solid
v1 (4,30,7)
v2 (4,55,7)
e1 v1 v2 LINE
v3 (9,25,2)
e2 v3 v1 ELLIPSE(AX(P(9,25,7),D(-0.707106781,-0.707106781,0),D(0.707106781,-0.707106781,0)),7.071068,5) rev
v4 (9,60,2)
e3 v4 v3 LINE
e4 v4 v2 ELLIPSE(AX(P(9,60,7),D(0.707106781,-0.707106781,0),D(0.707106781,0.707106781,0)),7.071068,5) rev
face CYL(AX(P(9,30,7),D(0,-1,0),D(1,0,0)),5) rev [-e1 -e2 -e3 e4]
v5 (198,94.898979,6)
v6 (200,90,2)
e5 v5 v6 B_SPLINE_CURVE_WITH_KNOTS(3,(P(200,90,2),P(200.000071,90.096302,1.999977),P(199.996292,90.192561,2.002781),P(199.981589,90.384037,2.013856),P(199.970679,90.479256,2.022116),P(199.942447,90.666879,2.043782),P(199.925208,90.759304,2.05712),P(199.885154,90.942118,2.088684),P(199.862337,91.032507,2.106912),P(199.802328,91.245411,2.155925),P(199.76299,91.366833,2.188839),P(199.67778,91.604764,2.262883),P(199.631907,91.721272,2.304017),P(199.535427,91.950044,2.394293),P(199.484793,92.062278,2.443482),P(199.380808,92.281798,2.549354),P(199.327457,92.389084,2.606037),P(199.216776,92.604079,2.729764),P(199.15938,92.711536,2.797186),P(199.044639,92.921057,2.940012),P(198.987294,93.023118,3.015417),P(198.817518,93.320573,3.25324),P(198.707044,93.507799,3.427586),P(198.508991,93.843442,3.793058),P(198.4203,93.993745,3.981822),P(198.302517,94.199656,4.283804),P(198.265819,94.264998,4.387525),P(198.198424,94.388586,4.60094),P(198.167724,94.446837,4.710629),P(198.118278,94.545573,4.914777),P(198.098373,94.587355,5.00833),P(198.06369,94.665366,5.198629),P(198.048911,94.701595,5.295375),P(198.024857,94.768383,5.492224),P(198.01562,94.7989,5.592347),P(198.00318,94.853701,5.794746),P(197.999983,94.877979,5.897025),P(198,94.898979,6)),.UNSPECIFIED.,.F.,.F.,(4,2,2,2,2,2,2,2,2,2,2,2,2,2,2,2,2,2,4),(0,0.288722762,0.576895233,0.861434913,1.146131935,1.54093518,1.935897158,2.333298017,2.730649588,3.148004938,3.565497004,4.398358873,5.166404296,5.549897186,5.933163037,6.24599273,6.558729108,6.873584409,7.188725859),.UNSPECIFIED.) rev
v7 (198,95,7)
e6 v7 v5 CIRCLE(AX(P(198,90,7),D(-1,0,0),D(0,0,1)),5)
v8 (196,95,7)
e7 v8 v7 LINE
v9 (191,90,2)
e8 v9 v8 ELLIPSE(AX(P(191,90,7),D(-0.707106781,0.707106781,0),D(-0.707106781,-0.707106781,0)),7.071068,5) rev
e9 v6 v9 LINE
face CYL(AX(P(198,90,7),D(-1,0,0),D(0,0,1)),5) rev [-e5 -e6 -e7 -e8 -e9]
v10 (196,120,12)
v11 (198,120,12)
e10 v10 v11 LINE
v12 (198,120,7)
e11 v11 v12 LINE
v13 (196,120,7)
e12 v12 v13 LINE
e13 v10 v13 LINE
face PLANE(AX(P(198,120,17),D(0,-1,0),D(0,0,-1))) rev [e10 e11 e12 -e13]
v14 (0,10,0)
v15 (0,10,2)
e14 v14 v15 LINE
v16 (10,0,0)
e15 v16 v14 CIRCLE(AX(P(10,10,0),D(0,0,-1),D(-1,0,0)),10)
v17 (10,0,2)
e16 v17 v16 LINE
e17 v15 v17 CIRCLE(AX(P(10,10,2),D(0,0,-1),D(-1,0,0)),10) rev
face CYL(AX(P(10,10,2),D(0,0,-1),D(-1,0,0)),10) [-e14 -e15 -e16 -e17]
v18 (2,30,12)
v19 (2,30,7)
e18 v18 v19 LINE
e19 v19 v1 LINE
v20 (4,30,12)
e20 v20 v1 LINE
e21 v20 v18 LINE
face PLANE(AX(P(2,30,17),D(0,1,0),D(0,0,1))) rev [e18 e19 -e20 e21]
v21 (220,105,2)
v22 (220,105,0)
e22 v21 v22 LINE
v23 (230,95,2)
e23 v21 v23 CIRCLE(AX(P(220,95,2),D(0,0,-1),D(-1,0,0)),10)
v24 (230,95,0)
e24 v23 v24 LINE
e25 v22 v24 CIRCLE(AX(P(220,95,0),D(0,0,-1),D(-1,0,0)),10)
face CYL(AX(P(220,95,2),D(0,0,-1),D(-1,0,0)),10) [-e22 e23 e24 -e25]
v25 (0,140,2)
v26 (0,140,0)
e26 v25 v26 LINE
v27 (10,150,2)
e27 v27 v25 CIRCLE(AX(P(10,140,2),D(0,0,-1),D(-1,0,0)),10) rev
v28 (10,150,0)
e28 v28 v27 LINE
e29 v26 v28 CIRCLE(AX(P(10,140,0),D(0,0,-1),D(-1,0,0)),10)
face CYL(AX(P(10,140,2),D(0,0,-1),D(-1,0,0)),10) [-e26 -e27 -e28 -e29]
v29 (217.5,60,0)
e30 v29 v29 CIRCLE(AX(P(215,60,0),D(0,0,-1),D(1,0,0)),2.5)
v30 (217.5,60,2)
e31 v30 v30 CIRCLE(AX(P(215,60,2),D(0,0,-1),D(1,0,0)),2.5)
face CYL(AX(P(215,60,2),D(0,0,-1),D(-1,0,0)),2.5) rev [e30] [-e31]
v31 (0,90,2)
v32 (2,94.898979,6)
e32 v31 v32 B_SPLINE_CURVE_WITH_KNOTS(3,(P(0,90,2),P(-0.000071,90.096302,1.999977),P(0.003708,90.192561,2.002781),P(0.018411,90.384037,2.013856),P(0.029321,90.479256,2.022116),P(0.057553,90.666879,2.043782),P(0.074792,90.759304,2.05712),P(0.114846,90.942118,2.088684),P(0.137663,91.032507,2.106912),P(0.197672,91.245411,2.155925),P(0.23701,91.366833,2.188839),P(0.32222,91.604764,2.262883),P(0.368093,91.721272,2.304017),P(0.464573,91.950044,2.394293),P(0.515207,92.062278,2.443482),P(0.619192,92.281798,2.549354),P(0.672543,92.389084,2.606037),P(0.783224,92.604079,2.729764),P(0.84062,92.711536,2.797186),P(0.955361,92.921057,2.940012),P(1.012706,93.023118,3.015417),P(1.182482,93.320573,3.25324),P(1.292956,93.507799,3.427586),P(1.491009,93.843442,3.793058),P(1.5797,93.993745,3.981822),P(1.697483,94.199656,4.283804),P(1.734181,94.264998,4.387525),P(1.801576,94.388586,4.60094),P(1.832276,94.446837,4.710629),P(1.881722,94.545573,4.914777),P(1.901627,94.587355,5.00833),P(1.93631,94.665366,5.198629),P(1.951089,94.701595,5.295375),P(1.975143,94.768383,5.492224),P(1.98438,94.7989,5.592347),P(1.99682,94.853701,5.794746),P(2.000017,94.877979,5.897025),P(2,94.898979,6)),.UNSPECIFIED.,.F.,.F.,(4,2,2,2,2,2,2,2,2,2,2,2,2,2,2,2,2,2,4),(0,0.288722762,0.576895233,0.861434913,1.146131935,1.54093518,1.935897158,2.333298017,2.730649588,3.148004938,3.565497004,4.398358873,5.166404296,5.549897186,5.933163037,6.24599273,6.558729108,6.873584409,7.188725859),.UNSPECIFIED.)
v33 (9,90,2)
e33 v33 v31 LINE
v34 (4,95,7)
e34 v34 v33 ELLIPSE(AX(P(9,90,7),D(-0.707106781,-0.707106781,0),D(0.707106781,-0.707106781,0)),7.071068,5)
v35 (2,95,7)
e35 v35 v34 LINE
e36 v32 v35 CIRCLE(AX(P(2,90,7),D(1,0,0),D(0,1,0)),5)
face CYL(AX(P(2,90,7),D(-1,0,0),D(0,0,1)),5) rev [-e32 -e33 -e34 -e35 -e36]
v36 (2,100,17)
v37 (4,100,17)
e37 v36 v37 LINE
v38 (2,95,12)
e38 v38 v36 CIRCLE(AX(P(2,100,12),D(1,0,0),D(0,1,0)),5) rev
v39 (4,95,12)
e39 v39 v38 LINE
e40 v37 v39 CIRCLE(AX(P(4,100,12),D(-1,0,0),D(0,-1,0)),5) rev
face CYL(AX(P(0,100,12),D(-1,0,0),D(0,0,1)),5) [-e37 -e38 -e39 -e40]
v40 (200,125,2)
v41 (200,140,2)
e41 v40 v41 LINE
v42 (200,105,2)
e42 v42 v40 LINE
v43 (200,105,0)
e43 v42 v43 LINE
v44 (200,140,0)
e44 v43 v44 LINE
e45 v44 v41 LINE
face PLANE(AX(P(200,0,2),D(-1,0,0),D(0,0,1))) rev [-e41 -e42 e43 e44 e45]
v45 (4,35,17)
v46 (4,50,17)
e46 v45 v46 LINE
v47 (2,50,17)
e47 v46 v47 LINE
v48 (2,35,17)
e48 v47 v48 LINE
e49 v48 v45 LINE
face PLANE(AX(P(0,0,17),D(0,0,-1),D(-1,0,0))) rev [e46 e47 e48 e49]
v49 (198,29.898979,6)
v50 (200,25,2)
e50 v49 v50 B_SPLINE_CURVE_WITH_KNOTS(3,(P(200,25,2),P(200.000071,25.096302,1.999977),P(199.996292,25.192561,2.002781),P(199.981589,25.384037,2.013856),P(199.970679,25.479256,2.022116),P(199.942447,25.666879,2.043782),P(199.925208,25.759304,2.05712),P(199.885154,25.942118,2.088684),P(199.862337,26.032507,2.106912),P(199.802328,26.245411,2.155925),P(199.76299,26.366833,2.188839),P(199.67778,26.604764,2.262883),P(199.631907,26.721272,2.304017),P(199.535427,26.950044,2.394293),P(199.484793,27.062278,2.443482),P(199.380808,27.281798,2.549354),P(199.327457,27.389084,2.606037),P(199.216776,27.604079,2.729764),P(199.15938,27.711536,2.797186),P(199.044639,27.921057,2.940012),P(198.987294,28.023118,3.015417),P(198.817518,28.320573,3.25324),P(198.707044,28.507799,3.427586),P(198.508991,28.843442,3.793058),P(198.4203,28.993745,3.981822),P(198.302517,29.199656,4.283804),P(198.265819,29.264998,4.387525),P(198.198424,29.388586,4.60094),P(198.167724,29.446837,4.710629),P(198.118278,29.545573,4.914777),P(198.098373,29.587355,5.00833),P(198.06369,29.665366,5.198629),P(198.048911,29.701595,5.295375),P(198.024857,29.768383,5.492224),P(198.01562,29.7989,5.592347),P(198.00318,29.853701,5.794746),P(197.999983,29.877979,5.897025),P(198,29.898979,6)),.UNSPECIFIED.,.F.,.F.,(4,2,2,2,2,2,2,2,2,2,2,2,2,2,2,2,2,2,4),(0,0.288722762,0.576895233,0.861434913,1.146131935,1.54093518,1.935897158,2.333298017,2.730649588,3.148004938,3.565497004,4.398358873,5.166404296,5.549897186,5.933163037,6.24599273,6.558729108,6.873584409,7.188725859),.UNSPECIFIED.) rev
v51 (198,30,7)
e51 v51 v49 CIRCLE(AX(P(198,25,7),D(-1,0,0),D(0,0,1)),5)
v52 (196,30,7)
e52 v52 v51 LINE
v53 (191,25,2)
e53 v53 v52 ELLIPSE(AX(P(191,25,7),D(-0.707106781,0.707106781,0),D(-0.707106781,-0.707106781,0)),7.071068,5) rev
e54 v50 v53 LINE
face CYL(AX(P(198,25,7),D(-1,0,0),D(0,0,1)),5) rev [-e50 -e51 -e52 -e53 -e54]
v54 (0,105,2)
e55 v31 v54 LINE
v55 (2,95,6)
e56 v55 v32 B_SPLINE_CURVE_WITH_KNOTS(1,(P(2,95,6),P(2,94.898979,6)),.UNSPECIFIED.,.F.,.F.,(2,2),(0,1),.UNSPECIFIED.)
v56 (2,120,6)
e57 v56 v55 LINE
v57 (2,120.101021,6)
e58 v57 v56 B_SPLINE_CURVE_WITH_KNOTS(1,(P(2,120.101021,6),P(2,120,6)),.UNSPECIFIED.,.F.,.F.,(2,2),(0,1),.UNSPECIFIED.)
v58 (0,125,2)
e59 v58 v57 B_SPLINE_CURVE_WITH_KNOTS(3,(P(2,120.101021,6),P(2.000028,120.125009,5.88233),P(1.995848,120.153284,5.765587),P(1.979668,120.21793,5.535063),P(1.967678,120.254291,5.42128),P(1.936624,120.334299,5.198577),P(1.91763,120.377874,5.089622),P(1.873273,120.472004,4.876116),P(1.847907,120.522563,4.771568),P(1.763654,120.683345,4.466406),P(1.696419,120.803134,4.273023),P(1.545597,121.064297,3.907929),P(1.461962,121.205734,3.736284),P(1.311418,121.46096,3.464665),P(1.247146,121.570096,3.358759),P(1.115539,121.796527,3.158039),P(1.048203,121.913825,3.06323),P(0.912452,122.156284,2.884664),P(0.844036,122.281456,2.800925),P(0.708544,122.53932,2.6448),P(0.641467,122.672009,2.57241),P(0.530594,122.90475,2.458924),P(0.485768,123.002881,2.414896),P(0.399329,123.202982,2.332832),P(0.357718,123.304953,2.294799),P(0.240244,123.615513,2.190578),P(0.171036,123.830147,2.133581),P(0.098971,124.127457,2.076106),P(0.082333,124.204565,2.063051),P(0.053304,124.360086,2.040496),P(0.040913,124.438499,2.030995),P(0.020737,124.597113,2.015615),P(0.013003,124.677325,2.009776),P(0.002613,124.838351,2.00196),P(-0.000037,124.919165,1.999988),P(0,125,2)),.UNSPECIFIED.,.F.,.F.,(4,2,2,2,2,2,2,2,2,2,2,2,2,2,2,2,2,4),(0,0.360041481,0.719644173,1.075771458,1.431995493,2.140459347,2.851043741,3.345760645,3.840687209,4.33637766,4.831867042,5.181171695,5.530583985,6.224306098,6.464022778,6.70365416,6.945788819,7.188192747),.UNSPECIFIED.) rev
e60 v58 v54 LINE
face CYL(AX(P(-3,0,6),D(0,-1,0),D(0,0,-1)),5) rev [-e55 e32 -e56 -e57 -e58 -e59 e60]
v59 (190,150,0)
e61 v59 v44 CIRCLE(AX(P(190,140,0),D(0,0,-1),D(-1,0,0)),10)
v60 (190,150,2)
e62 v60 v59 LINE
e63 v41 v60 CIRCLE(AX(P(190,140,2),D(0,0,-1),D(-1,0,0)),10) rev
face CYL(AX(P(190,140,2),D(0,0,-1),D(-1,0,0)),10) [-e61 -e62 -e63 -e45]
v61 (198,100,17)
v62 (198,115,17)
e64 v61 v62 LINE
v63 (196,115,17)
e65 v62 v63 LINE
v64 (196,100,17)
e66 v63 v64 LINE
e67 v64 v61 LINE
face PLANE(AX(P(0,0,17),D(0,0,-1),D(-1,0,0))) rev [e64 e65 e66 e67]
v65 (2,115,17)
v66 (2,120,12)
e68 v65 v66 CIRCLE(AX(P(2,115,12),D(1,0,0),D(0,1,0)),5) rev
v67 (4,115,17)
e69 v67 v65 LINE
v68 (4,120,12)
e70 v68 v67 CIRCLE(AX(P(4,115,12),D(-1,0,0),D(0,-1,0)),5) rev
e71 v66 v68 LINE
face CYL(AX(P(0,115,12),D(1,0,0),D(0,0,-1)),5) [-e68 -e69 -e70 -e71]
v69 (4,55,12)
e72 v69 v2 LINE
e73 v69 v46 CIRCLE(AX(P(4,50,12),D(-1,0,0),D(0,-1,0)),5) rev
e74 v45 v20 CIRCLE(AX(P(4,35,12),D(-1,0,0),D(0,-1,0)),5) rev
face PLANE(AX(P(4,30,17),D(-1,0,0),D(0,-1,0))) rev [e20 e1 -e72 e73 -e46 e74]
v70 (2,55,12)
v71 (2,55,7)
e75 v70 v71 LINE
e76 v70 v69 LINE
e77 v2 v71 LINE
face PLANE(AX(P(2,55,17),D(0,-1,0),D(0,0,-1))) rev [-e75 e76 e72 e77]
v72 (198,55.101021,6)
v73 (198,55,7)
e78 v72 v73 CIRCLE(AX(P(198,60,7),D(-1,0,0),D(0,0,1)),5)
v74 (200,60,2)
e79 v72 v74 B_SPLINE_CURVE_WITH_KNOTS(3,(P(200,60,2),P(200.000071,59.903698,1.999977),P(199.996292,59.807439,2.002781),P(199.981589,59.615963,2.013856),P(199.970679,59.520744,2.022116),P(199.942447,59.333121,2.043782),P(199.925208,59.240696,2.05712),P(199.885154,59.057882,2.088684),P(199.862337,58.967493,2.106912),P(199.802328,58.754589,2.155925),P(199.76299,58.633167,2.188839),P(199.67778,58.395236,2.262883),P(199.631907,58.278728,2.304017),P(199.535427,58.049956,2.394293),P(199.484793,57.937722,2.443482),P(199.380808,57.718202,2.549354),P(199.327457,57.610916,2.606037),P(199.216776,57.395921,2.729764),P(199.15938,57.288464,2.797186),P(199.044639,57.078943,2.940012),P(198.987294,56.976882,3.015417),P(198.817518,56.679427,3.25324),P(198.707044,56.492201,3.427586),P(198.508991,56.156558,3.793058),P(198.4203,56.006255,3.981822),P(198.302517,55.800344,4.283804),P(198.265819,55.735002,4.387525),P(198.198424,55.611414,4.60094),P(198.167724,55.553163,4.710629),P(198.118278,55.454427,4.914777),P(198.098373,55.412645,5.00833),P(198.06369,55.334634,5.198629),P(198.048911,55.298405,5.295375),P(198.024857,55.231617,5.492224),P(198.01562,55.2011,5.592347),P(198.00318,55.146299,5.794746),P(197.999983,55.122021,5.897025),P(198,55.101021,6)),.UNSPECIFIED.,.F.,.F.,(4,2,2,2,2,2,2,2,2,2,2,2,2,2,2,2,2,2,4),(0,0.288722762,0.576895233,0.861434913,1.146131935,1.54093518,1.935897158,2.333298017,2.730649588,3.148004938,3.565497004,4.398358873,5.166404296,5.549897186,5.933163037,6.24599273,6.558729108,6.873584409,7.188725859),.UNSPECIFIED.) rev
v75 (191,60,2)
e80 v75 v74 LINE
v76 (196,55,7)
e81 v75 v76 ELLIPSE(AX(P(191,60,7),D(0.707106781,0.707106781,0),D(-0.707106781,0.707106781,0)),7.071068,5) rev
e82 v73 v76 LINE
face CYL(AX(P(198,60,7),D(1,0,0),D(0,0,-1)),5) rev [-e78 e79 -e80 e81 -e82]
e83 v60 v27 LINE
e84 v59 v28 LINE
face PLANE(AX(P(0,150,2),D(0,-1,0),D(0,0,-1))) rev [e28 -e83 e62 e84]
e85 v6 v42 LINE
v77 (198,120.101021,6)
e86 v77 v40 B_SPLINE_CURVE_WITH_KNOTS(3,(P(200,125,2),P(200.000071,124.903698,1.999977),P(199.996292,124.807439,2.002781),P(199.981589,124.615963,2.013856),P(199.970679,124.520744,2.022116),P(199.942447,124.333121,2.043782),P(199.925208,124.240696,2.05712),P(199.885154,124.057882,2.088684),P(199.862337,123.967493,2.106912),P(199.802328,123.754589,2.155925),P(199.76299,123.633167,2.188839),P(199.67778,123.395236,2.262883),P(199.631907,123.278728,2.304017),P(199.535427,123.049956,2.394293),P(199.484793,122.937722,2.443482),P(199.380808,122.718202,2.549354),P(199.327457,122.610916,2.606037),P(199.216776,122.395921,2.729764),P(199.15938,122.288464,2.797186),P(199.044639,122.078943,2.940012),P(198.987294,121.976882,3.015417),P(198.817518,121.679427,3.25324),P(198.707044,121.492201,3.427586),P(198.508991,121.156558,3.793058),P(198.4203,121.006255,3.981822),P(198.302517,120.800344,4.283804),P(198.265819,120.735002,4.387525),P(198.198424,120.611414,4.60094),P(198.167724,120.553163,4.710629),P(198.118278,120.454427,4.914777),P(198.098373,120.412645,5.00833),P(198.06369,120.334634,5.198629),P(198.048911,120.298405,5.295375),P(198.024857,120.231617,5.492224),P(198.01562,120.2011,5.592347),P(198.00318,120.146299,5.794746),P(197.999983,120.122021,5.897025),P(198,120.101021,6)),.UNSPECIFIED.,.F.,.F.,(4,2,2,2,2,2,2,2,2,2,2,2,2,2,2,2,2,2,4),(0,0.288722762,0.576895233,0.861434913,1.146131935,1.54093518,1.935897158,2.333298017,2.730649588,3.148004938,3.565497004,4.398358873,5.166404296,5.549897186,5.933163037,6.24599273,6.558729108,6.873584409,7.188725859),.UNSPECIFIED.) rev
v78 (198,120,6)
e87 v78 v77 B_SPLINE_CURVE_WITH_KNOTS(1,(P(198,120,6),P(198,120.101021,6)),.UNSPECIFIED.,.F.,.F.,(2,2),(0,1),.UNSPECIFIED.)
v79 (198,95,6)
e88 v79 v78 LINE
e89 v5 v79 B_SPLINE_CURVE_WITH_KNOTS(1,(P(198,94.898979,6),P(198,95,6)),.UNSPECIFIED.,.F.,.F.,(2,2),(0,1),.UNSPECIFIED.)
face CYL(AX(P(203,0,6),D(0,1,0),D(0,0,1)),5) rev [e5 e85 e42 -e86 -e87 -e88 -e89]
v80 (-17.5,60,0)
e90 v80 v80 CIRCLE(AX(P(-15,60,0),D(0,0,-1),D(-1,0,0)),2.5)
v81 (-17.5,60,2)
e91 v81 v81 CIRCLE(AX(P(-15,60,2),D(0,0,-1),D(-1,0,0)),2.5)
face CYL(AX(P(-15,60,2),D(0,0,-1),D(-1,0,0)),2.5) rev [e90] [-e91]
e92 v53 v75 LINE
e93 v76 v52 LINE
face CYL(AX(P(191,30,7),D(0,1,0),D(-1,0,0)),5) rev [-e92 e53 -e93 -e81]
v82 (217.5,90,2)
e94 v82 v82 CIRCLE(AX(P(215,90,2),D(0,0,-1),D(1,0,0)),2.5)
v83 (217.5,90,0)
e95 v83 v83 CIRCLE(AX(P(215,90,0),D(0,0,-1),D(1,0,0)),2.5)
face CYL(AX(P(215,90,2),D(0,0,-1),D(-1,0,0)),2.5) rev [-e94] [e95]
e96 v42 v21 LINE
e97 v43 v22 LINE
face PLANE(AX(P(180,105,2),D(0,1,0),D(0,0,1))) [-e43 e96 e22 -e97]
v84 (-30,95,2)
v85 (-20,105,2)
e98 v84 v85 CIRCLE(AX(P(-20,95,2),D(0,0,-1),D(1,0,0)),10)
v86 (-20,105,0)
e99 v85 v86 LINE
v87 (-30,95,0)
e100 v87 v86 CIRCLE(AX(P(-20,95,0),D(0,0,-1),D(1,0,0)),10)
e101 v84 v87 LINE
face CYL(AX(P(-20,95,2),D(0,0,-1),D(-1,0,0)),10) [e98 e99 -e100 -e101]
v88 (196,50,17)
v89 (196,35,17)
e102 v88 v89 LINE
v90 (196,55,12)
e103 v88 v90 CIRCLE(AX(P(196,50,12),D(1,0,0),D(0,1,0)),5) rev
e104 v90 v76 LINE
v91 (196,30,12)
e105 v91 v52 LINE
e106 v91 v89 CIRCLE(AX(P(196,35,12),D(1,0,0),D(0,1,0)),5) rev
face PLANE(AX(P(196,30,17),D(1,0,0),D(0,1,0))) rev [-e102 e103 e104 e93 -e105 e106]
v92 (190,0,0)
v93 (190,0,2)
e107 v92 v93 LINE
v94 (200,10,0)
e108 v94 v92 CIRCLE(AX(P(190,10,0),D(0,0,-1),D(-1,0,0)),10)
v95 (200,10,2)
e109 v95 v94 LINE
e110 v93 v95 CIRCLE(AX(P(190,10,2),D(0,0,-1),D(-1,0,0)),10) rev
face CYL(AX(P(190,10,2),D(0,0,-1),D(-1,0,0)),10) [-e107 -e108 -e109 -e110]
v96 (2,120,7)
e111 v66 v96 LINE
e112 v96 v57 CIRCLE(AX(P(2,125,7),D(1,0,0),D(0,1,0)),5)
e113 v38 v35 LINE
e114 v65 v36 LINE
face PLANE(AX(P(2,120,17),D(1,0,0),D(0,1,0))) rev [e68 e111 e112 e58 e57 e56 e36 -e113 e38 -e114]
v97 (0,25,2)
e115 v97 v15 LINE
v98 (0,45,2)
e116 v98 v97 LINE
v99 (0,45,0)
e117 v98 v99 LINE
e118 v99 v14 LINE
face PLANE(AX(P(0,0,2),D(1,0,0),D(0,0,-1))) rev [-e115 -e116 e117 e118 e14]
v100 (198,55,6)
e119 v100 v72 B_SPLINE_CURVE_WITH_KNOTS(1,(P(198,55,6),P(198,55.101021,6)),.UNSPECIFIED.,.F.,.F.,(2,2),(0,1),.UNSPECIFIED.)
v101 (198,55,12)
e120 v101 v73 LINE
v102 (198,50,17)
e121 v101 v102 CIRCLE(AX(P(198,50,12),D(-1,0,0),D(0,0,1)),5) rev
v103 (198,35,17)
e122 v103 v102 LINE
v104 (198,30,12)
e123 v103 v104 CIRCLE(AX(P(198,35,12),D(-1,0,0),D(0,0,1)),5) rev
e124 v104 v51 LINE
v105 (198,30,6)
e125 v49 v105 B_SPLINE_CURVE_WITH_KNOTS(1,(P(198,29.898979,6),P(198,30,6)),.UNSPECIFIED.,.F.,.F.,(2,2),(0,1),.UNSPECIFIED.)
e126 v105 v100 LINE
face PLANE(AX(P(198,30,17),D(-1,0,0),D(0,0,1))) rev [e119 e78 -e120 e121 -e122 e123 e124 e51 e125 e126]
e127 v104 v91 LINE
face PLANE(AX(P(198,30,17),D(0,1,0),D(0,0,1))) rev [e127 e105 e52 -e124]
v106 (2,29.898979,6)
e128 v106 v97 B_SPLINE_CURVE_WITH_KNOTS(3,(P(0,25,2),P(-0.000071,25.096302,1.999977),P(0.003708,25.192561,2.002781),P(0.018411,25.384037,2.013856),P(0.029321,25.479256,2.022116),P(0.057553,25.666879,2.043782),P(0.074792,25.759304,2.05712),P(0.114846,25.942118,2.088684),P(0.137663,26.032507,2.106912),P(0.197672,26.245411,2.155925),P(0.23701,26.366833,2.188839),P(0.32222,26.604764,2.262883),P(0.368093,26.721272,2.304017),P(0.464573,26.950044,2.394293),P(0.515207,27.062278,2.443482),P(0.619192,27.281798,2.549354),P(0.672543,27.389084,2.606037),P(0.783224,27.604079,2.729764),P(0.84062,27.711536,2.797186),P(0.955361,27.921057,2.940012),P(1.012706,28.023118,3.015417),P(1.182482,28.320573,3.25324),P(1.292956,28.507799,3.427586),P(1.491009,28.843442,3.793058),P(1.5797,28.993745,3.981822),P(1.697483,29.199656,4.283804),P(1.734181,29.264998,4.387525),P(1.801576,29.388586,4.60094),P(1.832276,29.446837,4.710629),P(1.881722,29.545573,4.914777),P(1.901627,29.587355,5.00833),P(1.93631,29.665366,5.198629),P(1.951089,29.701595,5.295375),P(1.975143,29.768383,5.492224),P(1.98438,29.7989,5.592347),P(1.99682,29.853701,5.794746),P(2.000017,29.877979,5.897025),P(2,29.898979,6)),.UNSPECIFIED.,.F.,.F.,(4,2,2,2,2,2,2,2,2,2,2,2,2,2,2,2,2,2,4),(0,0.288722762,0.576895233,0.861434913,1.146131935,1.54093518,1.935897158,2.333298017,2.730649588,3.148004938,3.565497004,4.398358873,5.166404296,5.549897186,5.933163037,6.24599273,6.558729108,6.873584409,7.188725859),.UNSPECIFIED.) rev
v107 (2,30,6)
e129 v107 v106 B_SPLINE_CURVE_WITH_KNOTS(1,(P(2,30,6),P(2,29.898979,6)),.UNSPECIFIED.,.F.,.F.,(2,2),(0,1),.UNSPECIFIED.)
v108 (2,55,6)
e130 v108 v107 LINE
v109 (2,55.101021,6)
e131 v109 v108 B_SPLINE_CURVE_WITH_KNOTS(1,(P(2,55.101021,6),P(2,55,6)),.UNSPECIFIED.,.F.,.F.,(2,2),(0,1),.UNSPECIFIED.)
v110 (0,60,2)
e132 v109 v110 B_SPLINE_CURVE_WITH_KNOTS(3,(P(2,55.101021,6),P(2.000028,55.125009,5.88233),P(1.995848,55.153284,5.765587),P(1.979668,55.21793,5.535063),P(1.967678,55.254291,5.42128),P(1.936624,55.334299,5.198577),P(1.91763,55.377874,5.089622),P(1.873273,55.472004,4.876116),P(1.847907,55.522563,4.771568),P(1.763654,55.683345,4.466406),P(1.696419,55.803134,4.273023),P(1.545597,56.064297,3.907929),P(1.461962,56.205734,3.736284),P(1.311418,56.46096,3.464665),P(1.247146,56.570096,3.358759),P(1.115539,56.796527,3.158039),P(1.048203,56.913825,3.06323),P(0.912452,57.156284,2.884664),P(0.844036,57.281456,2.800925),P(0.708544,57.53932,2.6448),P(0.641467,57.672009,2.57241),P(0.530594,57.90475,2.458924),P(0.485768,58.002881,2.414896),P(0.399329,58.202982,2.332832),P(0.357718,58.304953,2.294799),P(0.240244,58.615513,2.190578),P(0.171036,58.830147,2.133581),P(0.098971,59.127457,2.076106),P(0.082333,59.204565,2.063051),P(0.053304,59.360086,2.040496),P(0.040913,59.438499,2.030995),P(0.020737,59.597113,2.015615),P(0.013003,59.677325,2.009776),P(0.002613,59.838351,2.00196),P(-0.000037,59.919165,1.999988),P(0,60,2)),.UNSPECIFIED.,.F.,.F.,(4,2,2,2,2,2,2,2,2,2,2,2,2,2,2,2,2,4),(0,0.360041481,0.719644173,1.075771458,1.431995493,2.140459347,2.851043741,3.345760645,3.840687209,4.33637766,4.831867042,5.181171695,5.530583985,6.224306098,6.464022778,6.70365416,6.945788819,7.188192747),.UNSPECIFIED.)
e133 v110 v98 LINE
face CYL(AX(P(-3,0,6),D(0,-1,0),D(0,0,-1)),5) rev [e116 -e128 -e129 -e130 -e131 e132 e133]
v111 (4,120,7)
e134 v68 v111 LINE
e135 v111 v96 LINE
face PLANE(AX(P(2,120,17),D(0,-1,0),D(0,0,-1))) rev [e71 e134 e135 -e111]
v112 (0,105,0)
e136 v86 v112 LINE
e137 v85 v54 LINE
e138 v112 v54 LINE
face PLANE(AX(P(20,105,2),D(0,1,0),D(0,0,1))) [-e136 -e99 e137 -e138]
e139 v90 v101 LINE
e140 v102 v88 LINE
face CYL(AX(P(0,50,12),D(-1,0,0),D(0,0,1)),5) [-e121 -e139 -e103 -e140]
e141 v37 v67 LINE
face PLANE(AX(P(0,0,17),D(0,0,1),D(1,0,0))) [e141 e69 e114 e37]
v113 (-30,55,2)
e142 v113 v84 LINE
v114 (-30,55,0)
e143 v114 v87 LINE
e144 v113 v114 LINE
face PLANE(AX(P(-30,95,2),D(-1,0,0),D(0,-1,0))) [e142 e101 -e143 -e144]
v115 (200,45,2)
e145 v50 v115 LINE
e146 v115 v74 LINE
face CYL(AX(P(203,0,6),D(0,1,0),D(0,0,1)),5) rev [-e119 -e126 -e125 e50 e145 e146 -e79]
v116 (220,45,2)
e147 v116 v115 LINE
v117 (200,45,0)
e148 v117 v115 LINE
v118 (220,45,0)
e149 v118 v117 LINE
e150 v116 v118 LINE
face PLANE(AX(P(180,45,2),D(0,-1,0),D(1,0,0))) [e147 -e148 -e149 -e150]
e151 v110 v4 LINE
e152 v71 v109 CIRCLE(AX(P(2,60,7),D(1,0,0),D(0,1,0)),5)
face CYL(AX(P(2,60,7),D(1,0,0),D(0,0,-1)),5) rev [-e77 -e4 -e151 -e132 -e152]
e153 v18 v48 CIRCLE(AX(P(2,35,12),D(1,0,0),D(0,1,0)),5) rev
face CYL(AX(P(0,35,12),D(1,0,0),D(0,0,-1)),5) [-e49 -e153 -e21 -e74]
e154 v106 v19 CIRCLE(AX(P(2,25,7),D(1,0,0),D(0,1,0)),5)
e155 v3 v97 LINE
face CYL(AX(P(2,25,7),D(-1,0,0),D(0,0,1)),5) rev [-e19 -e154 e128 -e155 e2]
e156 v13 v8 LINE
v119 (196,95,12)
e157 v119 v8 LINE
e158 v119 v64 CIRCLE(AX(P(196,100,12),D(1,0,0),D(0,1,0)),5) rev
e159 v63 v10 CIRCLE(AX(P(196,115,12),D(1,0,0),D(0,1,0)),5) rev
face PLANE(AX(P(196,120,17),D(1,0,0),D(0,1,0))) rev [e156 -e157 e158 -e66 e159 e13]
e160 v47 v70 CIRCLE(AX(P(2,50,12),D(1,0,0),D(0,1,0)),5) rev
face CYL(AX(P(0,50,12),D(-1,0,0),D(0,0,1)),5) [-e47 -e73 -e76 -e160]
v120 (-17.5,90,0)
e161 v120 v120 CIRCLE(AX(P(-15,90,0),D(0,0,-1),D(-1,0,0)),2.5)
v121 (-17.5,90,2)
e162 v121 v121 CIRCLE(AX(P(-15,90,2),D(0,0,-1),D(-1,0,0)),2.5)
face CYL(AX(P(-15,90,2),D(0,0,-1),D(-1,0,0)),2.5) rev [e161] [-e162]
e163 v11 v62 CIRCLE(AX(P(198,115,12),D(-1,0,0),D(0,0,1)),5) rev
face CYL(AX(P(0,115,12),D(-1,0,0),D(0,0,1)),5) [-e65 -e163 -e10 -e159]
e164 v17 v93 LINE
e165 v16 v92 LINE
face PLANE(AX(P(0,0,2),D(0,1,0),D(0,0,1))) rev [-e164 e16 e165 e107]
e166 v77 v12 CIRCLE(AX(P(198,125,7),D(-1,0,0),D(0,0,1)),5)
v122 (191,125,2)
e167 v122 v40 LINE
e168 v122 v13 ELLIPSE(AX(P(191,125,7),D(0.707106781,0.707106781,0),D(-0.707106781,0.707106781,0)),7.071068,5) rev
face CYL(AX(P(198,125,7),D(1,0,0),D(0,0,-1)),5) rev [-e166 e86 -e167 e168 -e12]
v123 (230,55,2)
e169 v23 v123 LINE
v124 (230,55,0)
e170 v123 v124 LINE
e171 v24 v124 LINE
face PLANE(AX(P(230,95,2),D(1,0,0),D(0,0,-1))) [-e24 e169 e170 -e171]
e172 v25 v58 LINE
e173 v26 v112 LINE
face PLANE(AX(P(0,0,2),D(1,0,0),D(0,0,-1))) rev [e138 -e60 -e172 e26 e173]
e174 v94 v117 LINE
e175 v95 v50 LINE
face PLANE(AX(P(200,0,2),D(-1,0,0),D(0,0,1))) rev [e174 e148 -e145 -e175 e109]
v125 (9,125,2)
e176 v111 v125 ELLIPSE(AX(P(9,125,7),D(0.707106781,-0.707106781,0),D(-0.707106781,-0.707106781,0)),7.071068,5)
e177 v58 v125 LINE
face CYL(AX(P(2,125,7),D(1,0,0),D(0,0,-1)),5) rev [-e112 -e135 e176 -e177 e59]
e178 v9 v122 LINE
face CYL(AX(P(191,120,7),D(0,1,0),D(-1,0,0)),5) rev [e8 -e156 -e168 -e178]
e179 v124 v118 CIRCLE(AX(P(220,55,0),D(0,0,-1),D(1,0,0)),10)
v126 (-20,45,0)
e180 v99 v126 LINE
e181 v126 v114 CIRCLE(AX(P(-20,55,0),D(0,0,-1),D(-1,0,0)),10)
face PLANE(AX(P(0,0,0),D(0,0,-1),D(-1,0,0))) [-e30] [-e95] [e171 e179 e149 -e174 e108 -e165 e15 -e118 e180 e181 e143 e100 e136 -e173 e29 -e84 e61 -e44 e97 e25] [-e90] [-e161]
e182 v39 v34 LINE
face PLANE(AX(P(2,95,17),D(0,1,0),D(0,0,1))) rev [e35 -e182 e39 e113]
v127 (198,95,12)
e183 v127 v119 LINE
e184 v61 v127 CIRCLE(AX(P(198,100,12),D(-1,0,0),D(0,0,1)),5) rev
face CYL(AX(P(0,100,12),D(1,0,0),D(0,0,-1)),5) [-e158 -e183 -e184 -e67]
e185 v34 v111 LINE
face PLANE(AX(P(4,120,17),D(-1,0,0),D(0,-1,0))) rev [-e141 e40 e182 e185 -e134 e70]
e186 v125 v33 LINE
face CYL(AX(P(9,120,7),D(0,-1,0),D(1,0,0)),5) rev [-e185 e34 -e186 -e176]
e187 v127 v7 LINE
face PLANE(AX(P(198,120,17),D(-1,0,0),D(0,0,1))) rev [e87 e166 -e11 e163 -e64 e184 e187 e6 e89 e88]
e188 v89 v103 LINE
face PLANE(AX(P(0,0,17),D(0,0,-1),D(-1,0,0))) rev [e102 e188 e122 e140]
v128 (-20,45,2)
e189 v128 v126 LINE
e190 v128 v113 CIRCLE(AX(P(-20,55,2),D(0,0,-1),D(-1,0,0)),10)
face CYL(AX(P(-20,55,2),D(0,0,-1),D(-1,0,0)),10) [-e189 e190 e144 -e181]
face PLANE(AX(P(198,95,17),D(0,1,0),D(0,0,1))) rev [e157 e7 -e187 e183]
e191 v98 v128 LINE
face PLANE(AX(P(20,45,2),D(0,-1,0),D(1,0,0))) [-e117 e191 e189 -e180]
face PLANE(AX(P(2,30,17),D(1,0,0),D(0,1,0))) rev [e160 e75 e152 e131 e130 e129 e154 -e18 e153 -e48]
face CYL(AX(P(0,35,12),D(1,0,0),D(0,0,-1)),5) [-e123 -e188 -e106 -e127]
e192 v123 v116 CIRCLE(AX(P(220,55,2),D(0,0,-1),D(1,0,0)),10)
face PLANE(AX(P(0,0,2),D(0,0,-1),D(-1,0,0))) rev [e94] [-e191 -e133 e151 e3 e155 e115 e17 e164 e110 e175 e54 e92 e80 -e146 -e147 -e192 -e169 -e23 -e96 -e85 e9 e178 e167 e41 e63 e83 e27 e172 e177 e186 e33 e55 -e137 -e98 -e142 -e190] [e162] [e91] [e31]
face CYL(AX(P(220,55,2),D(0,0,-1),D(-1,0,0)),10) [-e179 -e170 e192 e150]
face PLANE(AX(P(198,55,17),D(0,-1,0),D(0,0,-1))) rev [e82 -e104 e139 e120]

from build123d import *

# Parameters (mm, degrees)
ESQUISSE1_W             = 200
ESQUISSE1_H             = 150
BOSS_EXTRU_1_DEPTH      = 2
CONG_1_R                = 10
ESQUISSE2_W             = 2
ESQUISSE2_H             = 25
BOSS_EXTRU_2_DEPTH      = 15
CONG_2_R                = 5
ESQUISSE3_W             = 4.5
ESQUISSE3_H             = 30
ENL_V_MAT_EXTRU_1_DEPTH = 15
ESQUISSE4_R             = 2.5
BOSS_EXTRU_3_DEPTH      = 2


with BuildPart() as part:
    # Esquisse1 → Boss.-Extru.1 (new body)
    with BuildSketch(Plane.XY):
        with Locations((100, 75)):
            Rectangle(ESQUISSE1_W, ESQUISSE1_H)
    extrude(amount=BOSS_EXTRU_1_DEPTH)

    # Congé1
    cong_1_edges = [part.edges().sort_by_distance(p)[0] for p in [
        (0, 150, 1),
        (200, 150, 1),
        (200, 0, 1),
        (0, 0, 1),
    ]]
    fillet(cong_1_edges, radius=CONG_1_R)

    # Esquisse2 → Boss.-Extru.2 (add)
    with BuildSketch(Plane.XY.offset(2)):
        with Locations((3, 107.5)):
            Rectangle(ESQUISSE2_W, ESQUISSE2_H)
        with Locations((3, 42.5)):
            Rectangle(ESQUISSE2_W, ESQUISSE2_H)
        with Locations((197, 42.5)):
            Rectangle(ESQUISSE2_W, ESQUISSE2_H)
        with Locations((197, 107.5)):
            Rectangle(ESQUISSE2_W, ESQUISSE2_H)
    extrude(amount=BOSS_EXTRU_2_DEPTH)

    # Congé2
    # the kernel refuses this fillet: 5 mm, written as the material it adds along each edge
    with BuildSketch(Plane(origin=(2, 30, 2), x_dir=(-1, 0, 0), z_dir=(0, 1, 0)), Plane(origin=(2, 95, 2), x_dir=(-1, 0, 0), z_dir=(0, 1, 0))) as cong_2_piece_1:
        with BuildLine():
            CenterArc((5, 4), CONG_2_R, 180, 53.130102354)
            Line((0, 4), (0, 0))
            Line((0, 0), (2, 0))
        make_face()
    extrude(amount=25)
    with BuildSketch(Plane(origin=(4, 30, 2), x_dir=(0, -1, 0), z_dir=(-1, 0, 0)), Plane(origin=(2, 55, 2), x_dir=(0, 1, 0), z_dir=(1, 0, 0)), Plane(origin=(4, 95, 2), x_dir=(0, -1, 0), z_dir=(-1, 0, 0)), Plane(origin=(2, 120, 2), x_dir=(0, 1, 0), z_dir=(1, 0, 0))) as cong_2_piece_2:
        with BuildLine():
            CenterArc((CONG_2_R, CONG_2_R), CONG_2_R, 180, 90)
            Line((0, CONG_2_R), (0, 0))
            Line((0, 0), (CONG_2_R, 0))
        make_face()
    extrude(amount=2)
    with BuildSketch(Plane(origin=(4, 55, 2), x_dir=(1, 0, 0), z_dir=(0, -1, 0)), Plane(origin=(4, 120, 2), x_dir=(1, 0, 0), z_dir=(0, -1, 0))) as cong_2_piece_3:
        with BuildLine():
            CenterArc((CONG_2_R, CONG_2_R), CONG_2_R, 180, 90)
            Line((0, CONG_2_R), (0, 0))
            Line((0, 0), (CONG_2_R, 0))
        make_face()
    extrude(amount=25)
    with BuildSketch(Plane(origin=(198, 95, 2), x_dir=(1, 0, 0), z_dir=(0, 1, 0)), Plane(origin=(198, 30, 2), x_dir=(1, 0, 0), z_dir=(0, 1, 0))) as cong_2_piece_4:
        with BuildLine():
            CenterArc((5, -4), CONG_2_R, 126.869897646, 53.130102354)
            Line((0, -4), (0, 0))
            Line((0, 0), (2, 0))
        make_face()
    extrude(amount=25)
    with BuildSketch(Plane(origin=(198, 120, 2), x_dir=(0, 1, 0), z_dir=(-1, 0, 0)), Plane(origin=(196, 95, 2), x_dir=(0, -1, 0), z_dir=(1, 0, 0)), Plane(origin=(196, 30, 2), x_dir=(0, -1, 0), z_dir=(1, 0, 0)), Plane(origin=(198, 55, 2), x_dir=(0, 1, 0), z_dir=(-1, 0, 0))) as cong_2_piece_5:
        with BuildLine():
            CenterArc((CONG_2_R, -CONG_2_R), CONG_2_R, 90, 90)
            Line((0, -CONG_2_R), (0, 0))
            Line((0, 0), (CONG_2_R, 0))
        make_face()
    extrude(amount=2)
    with BuildSketch(Plane(origin=(196, 120, 2), x_dir=(-1, 0, 0), z_dir=(0, -1, 0)), Plane(origin=(196, 55, 2), x_dir=(-1, 0, 0), z_dir=(0, -1, 0))) as cong_2_piece_6:
        with BuildLine():
            CenterArc((CONG_2_R, -CONG_2_R), CONG_2_R, 90, 90)
            Line((0, -CONG_2_R), (0, 0))
            Line((0, 0), (CONG_2_R, 0))
        make_face()
    extrude(amount=25)
    with BuildSketch(Plane(origin=(2, 20, 2), x_dir=(-1, 0, 0), z_dir=(0, 1, 0))) as cong_2_piece_7a_section:
        with BuildLine():
            CenterArc((5, 4), CONG_2_R, 180, 53.130102354)
            Line((0, 4), (0, 0))
            Line((0, 0), (2, 0))
        make_face()
    cong_2_piece_7a = extrude(amount=35, mode=Mode.PRIVATE)
    cong_2_piece_7a = split(cong_2_piece_7a, bisect_by=Plane(origin=(2, 30, 2), z_dir=(0, -1, 0)), keep=Keep.TOP, mode=Mode.PRIVATE)
    with BuildSketch(Plane(origin=(4, 30, 2), x_dir=(0, -1, 0), z_dir=(-1, 0, 0))) as cong_2_piece_7b_section:
        with BuildLine():
            CenterArc((CONG_2_R, CONG_2_R), CONG_2_R, 180, 90)
            Line((0, CONG_2_R), (0, 0))
            Line((0, 0), (CONG_2_R, 0))
        make_face()
    cong_2_piece_7b = extrude(amount=14.5, mode=Mode.PRIVATE)
    cong_2_piece_7b = split(cong_2_piece_7b, bisect_by=Plane(origin=(0, 30, 2), z_dir=(1, 0, 0)), keep=Keep.TOP, mode=Mode.PRIVATE)
    cong_2_piece_7b = split(cong_2_piece_7b, bisect_by=Plane(origin=(2, 30, 2), z_dir=(-1, 0, 0)), keep=Keep.TOP, mode=Mode.PRIVATE)
    cong_2_piece_7 = cong_2_piece_7a & cong_2_piece_7b
    add(cong_2_piece_7)
    with BuildSketch(Plane(origin=(2, 30, 2), x_dir=(-1, 0, 0), z_dir=(0, 1, 0))) as cong_2_piece_8a_section:
        with BuildLine():
            CenterArc((5, 4), CONG_2_R, 180, 53.130102354)
            Line((0, 4), (0, 0))
            Line((0, 0), (2, 0))
        make_face()
    cong_2_piece_8a = extrude(amount=35, mode=Mode.PRIVATE)
    cong_2_piece_8a = split(cong_2_piece_8a, bisect_by=Plane(origin=(2, 55, 2), z_dir=(0, 1, 0)), keep=Keep.TOP, mode=Mode.PRIVATE)
    with BuildSketch(Plane(origin=(-10.5, 55, 2), x_dir=(0, 1, 0), z_dir=(1, 0, 0))) as cong_2_piece_8b_section:
        with BuildLine():
            CenterArc((CONG_2_R, CONG_2_R), CONG_2_R, 180, 90)
            Line((0, CONG_2_R), (0, 0))
            Line((0, 0), (CONG_2_R, 0))
        make_face()
    cong_2_piece_8b = extrude(amount=14.5, mode=Mode.PRIVATE)
    cong_2_piece_8b = split(cong_2_piece_8b, bisect_by=Plane(origin=(0, 55, 2), z_dir=(1, 0, 0)), keep=Keep.TOP, mode=Mode.PRIVATE)
    cong_2_piece_8b = split(cong_2_piece_8b, bisect_by=Plane(origin=(2, 55, 2), z_dir=(-1, 0, 0)), keep=Keep.TOP, mode=Mode.PRIVATE)
    cong_2_piece_8 = cong_2_piece_8a & cong_2_piece_8b
    add(cong_2_piece_8)
    with BuildSketch(Plane(origin=(16.5, 30, 2), x_dir=(0, -1, 0), z_dir=(-1, 0, 0))) as cong_2_piece_9a_section:
        with BuildLine():
            CenterArc((CONG_2_R, CONG_2_R), CONG_2_R, 180, 90)
            Line((0, CONG_2_R), (0, 0))
            Line((0, 0), (CONG_2_R, 0))
        make_face()
    cong_2_piece_9a = extrude(amount=14.5, mode=Mode.PRIVATE)
    cong_2_piece_9a = split(cong_2_piece_9a, bisect_by=Plane(origin=(4, 30, 2), z_dir=(1, 0, 0)), keep=Keep.TOP, mode=Mode.PRIVATE)
    with BuildSketch(Plane(origin=(4, 55, 2), x_dir=(1, 0, 0), z_dir=(0, -1, 0))) as cong_2_piece_9b_section:
        with BuildLine():
            CenterArc((CONG_2_R, CONG_2_R), CONG_2_R, 180, 90)
            Line((0, CONG_2_R), (0, 0))
            Line((0, 0), (CONG_2_R, 0))
        make_face()
    cong_2_piece_9b = extrude(amount=37.5, mode=Mode.PRIVATE)
    cong_2_piece_9b = split(cong_2_piece_9b, bisect_by=Plane(origin=(4, 30, 2), z_dir=(0, -1, 0)), keep=Keep.TOP, mode=Mode.PRIVATE)
    cong_2_piece_9 = cong_2_piece_9a & cong_2_piece_9b
    add(cong_2_piece_9)
    with BuildSketch(Plane(origin=(4, 67.5, 2), x_dir=(1, 0, 0), z_dir=(0, -1, 0))) as cong_2_piece_10a_section:
        with BuildLine():
            CenterArc((CONG_2_R, CONG_2_R), CONG_2_R, 180, 90)
            Line((0, CONG_2_R), (0, 0))
            Line((0, 0), (CONG_2_R, 0))
        make_face()
    cong_2_piece_10a = extrude(amount=37.5, mode=Mode.PRIVATE)
    cong_2_piece_10a = split(cong_2_piece_10a, bisect_by=Plane(origin=(4, 55, 2), z_dir=(0, 1, 0)), keep=Keep.TOP, mode=Mode.PRIVATE)
    with BuildSketch(Plane(origin=(2, 55, 2), x_dir=(0, 1, 0), z_dir=(1, 0, 0))) as cong_2_piece_10b_section:
        with BuildLine():
            CenterArc((CONG_2_R, CONG_2_R), CONG_2_R, 180, 90)
            Line((0, CONG_2_R), (0, 0))
            Line((0, 0), (CONG_2_R, 0))
        make_face()
    cong_2_piece_10b = extrude(amount=14.5, mode=Mode.PRIVATE)
    cong_2_piece_10b = split(cong_2_piece_10b, bisect_by=Plane(origin=(4, 55, 2), z_dir=(1, 0, 0)), keep=Keep.TOP, mode=Mode.PRIVATE)
    cong_2_piece_10 = cong_2_piece_10a & cong_2_piece_10b
    add(cong_2_piece_10)
    with BuildSketch(Plane(origin=(196, 95, 2), x_dir=(0, -1, 0), z_dir=(1, 0, 0))) as cong_2_piece_11a_section:
        with BuildLine():
            CenterArc((CONG_2_R, -CONG_2_R), CONG_2_R, 90, 90)
            Line((0, -CONG_2_R), (0, 0))
            Line((0, 0), (CONG_2_R, 0))
        make_face()
    cong_2_piece_11a = extrude(amount=14.5, mode=Mode.PRIVATE)
    cong_2_piece_11a = split(cong_2_piece_11a, bisect_by=Plane(origin=(200, 95, 2), z_dir=(-1, 0, 0)), keep=Keep.TOP, mode=Mode.PRIVATE)
    cong_2_piece_11a = split(cong_2_piece_11a, bisect_by=Plane(origin=(198, 95, 2), z_dir=(1, 0, 0)), keep=Keep.TOP, mode=Mode.PRIVATE)
    with BuildSketch(Plane(origin=(198, 85, 2), x_dir=(1, 0, 0), z_dir=(0, 1, 0))) as cong_2_piece_11b_section:
        with BuildLine():
            CenterArc((5, -4), CONG_2_R, 126.869897646, 53.130102354)
            Line((0, -4), (0, 0))
            Line((0, 0), (2, 0))
        make_face()
    cong_2_piece_11b = extrude(amount=35, mode=Mode.PRIVATE)
    cong_2_piece_11b = split(cong_2_piece_11b, bisect_by=Plane(origin=(198, 95, 2), z_dir=(0, -1, 0)), keep=Keep.TOP, mode=Mode.PRIVATE)
    cong_2_piece_11 = cong_2_piece_11a & cong_2_piece_11b
    add(cong_2_piece_11)
    with BuildSketch(Plane(origin=(198, 95, 2), x_dir=(1, 0, 0), z_dir=(0, 1, 0))) as cong_2_piece_12a_section:
        with BuildLine():
            CenterArc((5, -4), CONG_2_R, 126.869897646, 53.130102354)
            Line((0, -4), (0, 0))
            Line((0, 0), (2, 0))
        make_face()
    cong_2_piece_12a = extrude(amount=35, mode=Mode.PRIVATE)
    cong_2_piece_12a = split(cong_2_piece_12a, bisect_by=Plane(origin=(198, 120, 2), z_dir=(0, 1, 0)), keep=Keep.TOP, mode=Mode.PRIVATE)
    with BuildSketch(Plane(origin=(210.5, 120, 2), x_dir=(0, 1, 0), z_dir=(-1, 0, 0))) as cong_2_piece_12b_section:
        with BuildLine():
            CenterArc((CONG_2_R, -CONG_2_R), CONG_2_R, 90, 90)
            Line((0, -CONG_2_R), (0, 0))
            Line((0, 0), (CONG_2_R, 0))
        make_face()
    cong_2_piece_12b = extrude(amount=14.5, mode=Mode.PRIVATE)
    cong_2_piece_12b = split(cong_2_piece_12b, bisect_by=Plane(origin=(200, 120, 2), z_dir=(-1, 0, 0)), keep=Keep.TOP, mode=Mode.PRIVATE)
    cong_2_piece_12b = split(cong_2_piece_12b, bisect_by=Plane(origin=(198, 120, 2), z_dir=(1, 0, 0)), keep=Keep.TOP, mode=Mode.PRIVATE)
    cong_2_piece_12 = cong_2_piece_12a & cong_2_piece_12b
    add(cong_2_piece_12)
    with BuildSketch(Plane(origin=(196, 132.5, 2), x_dir=(-1, 0, 0), z_dir=(0, -1, 0))) as cong_2_piece_13a_section:
        with BuildLine():
            CenterArc((CONG_2_R, -CONG_2_R), CONG_2_R, 90, 90)
            Line((0, -CONG_2_R), (0, 0))
            Line((0, 0), (CONG_2_R, 0))
        make_face()
    cong_2_piece_13a = extrude(amount=37.5, mode=Mode.PRIVATE)
    cong_2_piece_13a = split(cong_2_piece_13a, bisect_by=Plane(origin=(196, 120, 2), z_dir=(0, 1, 0)), keep=Keep.TOP, mode=Mode.PRIVATE)
    with BuildSketch(Plane(origin=(198, 120, 2), x_dir=(0, 1, 0), z_dir=(-1, 0, 0))) as cong_2_piece_13b_section:
        with BuildLine():
            CenterArc((CONG_2_R, -CONG_2_R), CONG_2_R, 90, 90)
            Line((0, -CONG_2_R), (0, 0))
            Line((0, 0), (CONG_2_R, 0))
        make_face()
    cong_2_piece_13b = extrude(amount=14.5, mode=Mode.PRIVATE)
    cong_2_piece_13b = split(cong_2_piece_13b, bisect_by=Plane(origin=(196, 120, 2), z_dir=(-1, 0, 0)), keep=Keep.TOP, mode=Mode.PRIVATE)
    cong_2_piece_13 = cong_2_piece_13a & cong_2_piece_13b
    add(cong_2_piece_13)
    with BuildSketch(Plane(origin=(196, 120, 2), x_dir=(-1, 0, 0), z_dir=(0, -1, 0))) as cong_2_piece_14a_section:
        with BuildLine():
            CenterArc((CONG_2_R, -CONG_2_R), CONG_2_R, 90, 90)
            Line((0, -CONG_2_R), (0, 0))
            Line((0, 0), (CONG_2_R, 0))
        make_face()
    cong_2_piece_14a = extrude(amount=37.5, mode=Mode.PRIVATE)
    cong_2_piece_14a = split(cong_2_piece_14a, bisect_by=Plane(origin=(196, 95, 2), z_dir=(0, -1, 0)), keep=Keep.TOP, mode=Mode.PRIVATE)
    with BuildSketch(Plane(origin=(183.5, 95, 2), x_dir=(0, -1, 0), z_dir=(1, 0, 0))) as cong_2_piece_14b_section:
        with BuildLine():
            CenterArc((CONG_2_R, -CONG_2_R), CONG_2_R, 90, 90)
            Line((0, -CONG_2_R), (0, 0))
            Line((0, 0), (CONG_2_R, 0))
        make_face()
    cong_2_piece_14b = extrude(amount=14.5, mode=Mode.PRIVATE)
    cong_2_piece_14b = split(cong_2_piece_14b, bisect_by=Plane(origin=(196, 95, 2), z_dir=(-1, 0, 0)), keep=Keep.TOP, mode=Mode.PRIVATE)
    cong_2_piece_14 = cong_2_piece_14a & cong_2_piece_14b
    add(cong_2_piece_14)
    with BuildSketch(Plane(origin=(196, 55, 2), x_dir=(-1, 0, 0), z_dir=(0, -1, 0))) as cong_2_piece_15a_section:
        with BuildLine():
            CenterArc((CONG_2_R, -CONG_2_R), CONG_2_R, 90, 90)
            Line((0, -CONG_2_R), (0, 0))
            Line((0, 0), (CONG_2_R, 0))
        make_face()
    cong_2_piece_15a = extrude(amount=37.5, mode=Mode.PRIVATE)
    cong_2_piece_15a = split(cong_2_piece_15a, bisect_by=Plane(origin=(196, 30, 2), z_dir=(0, -1, 0)), keep=Keep.TOP, mode=Mode.PRIVATE)
    with BuildSketch(Plane(origin=(183.5, 30, 2), x_dir=(0, -1, 0), z_dir=(1, 0, 0))) as cong_2_piece_15b_section:
        with BuildLine():
            CenterArc((CONG_2_R, -CONG_2_R), CONG_2_R, 90, 90)
            Line((0, -CONG_2_R), (0, 0))
            Line((0, 0), (CONG_2_R, 0))
        make_face()
    cong_2_piece_15b = extrude(amount=14.5, mode=Mode.PRIVATE)
    cong_2_piece_15b = split(cong_2_piece_15b, bisect_by=Plane(origin=(196, 30, 2), z_dir=(-1, 0, 0)), keep=Keep.TOP, mode=Mode.PRIVATE)
    cong_2_piece_15 = cong_2_piece_15a & cong_2_piece_15b
    add(cong_2_piece_15)
    with BuildSketch(Plane(origin=(198, 20, 2), x_dir=(1, 0, 0), z_dir=(0, 1, 0))) as cong_2_piece_16a_section:
        with BuildLine():
            CenterArc((5, -4), CONG_2_R, 126.869897646, 53.130102354)
            Line((0, -4), (0, 0))
            Line((0, 0), (2, 0))
        make_face()
    cong_2_piece_16a = extrude(amount=35, mode=Mode.PRIVATE)
    cong_2_piece_16a = split(cong_2_piece_16a, bisect_by=Plane(origin=(198, 30, 2), z_dir=(0, -1, 0)), keep=Keep.TOP, mode=Mode.PRIVATE)
    with BuildSketch(Plane(origin=(196, 30, 2), x_dir=(0, -1, 0), z_dir=(1, 0, 0))) as cong_2_piece_16b_section:
        with BuildLine():
            CenterArc((CONG_2_R, -CONG_2_R), CONG_2_R, 90, 90)
            Line((0, -CONG_2_R), (0, 0))
            Line((0, 0), (CONG_2_R, 0))
        make_face()
    cong_2_piece_16b = extrude(amount=14.5, mode=Mode.PRIVATE)
    cong_2_piece_16b = split(cong_2_piece_16b, bisect_by=Plane(origin=(200, 30, 2), z_dir=(-1, 0, 0)), keep=Keep.TOP, mode=Mode.PRIVATE)
    cong_2_piece_16b = split(cong_2_piece_16b, bisect_by=Plane(origin=(198, 30, 2), z_dir=(1, 0, 0)), keep=Keep.TOP, mode=Mode.PRIVATE)
    cong_2_piece_16 = cong_2_piece_16a & cong_2_piece_16b
    add(cong_2_piece_16)
    with BuildSketch(Plane(origin=(198, 30, 2), x_dir=(1, 0, 0), z_dir=(0, 1, 0))) as cong_2_piece_17a_section:
        with BuildLine():
            CenterArc((5, -4), CONG_2_R, 126.869897646, 53.130102354)
            Line((0, -4), (0, 0))
            Line((0, 0), (2, 0))
        make_face()
    cong_2_piece_17a = extrude(amount=35, mode=Mode.PRIVATE)
    cong_2_piece_17a = split(cong_2_piece_17a, bisect_by=Plane(origin=(198, 55, 2), z_dir=(0, 1, 0)), keep=Keep.TOP, mode=Mode.PRIVATE)
    with BuildSketch(Plane(origin=(210.5, 55, 2), x_dir=(0, 1, 0), z_dir=(-1, 0, 0))) as cong_2_piece_17b_section:
        with BuildLine():
            CenterArc((CONG_2_R, -CONG_2_R), CONG_2_R, 90, 90)
            Line((0, -CONG_2_R), (0, 0))
            Line((0, 0), (CONG_2_R, 0))
        make_face()
    cong_2_piece_17b = extrude(amount=14.5, mode=Mode.PRIVATE)
    cong_2_piece_17b = split(cong_2_piece_17b, bisect_by=Plane(origin=(200, 55, 2), z_dir=(-1, 0, 0)), keep=Keep.TOP, mode=Mode.PRIVATE)
    cong_2_piece_17b = split(cong_2_piece_17b, bisect_by=Plane(origin=(198, 55, 2), z_dir=(1, 0, 0)), keep=Keep.TOP, mode=Mode.PRIVATE)
    cong_2_piece_17 = cong_2_piece_17a & cong_2_piece_17b
    add(cong_2_piece_17)
    with BuildSketch(Plane(origin=(198, 55, 2), x_dir=(0, 1, 0), z_dir=(-1, 0, 0))) as cong_2_piece_18a_section:
        with BuildLine():
            CenterArc((CONG_2_R, -CONG_2_R), CONG_2_R, 90, 90)
            Line((0, -CONG_2_R), (0, 0))
            Line((0, 0), (CONG_2_R, 0))
        make_face()
    cong_2_piece_18a = extrude(amount=14.5, mode=Mode.PRIVATE)
    cong_2_piece_18a = split(cong_2_piece_18a, bisect_by=Plane(origin=(196, 55, 2), z_dir=(-1, 0, 0)), keep=Keep.TOP, mode=Mode.PRIVATE)
    with BuildSketch(Plane(origin=(196, 67.5, 2), x_dir=(-1, 0, 0), z_dir=(0, -1, 0))) as cong_2_piece_18b_section:
        with BuildLine():
            CenterArc((CONG_2_R, -CONG_2_R), CONG_2_R, 90, 90)
            Line((0, -CONG_2_R), (0, 0))
            Line((0, 0), (CONG_2_R, 0))
        make_face()
    cong_2_piece_18b = extrude(amount=37.5, mode=Mode.PRIVATE)
    cong_2_piece_18b = split(cong_2_piece_18b, bisect_by=Plane(origin=(196, 55, 2), z_dir=(0, 1, 0)), keep=Keep.TOP, mode=Mode.PRIVATE)
    cong_2_piece_18 = cong_2_piece_18a & cong_2_piece_18b
    add(cong_2_piece_18)
    with BuildSketch(Plane(origin=(2, 85, 2), x_dir=(-1, 0, 0), z_dir=(0, 1, 0))) as cong_2_piece_19a_section:
        with BuildLine():
            CenterArc((5, 4), CONG_2_R, 180, 53.130102354)
            Line((0, 4), (0, 0))
            Line((0, 0), (2, 0))
        make_face()
    cong_2_piece_19a = extrude(amount=35, mode=Mode.PRIVATE)
    cong_2_piece_19a = split(cong_2_piece_19a, bisect_by=Plane(origin=(2, 95, 2), z_dir=(0, -1, 0)), keep=Keep.TOP, mode=Mode.PRIVATE)
    with BuildSketch(Plane(origin=(4, 95, 2), x_dir=(0, -1, 0), z_dir=(-1, 0, 0))) as cong_2_piece_19b_section:
        with BuildLine():
            CenterArc((CONG_2_R, CONG_2_R), CONG_2_R, 180, 90)
            Line((0, CONG_2_R), (0, 0))
            Line((0, 0), (CONG_2_R, 0))
        make_face()
    cong_2_piece_19b = extrude(amount=14.5, mode=Mode.PRIVATE)
    cong_2_piece_19b = split(cong_2_piece_19b, bisect_by=Plane(origin=(0, 95, 2), z_dir=(1, 0, 0)), keep=Keep.TOP, mode=Mode.PRIVATE)
    cong_2_piece_19b = split(cong_2_piece_19b, bisect_by=Plane(origin=(2, 95, 2), z_dir=(-1, 0, 0)), keep=Keep.TOP, mode=Mode.PRIVATE)
    cong_2_piece_19 = cong_2_piece_19a & cong_2_piece_19b
    add(cong_2_piece_19)
    with BuildSketch(Plane(origin=(2, 95, 2), x_dir=(-1, 0, 0), z_dir=(0, 1, 0))) as cong_2_piece_20a_section:
        with BuildLine():
            CenterArc((5, 4), CONG_2_R, 180, 53.130102354)
            Line((0, 4), (0, 0))
            Line((0, 0), (2, 0))
        make_face()
    cong_2_piece_20a = extrude(amount=35, mode=Mode.PRIVATE)
    cong_2_piece_20a = split(cong_2_piece_20a, bisect_by=Plane(origin=(2, 120, 2), z_dir=(0, 1, 0)), keep=Keep.TOP, mode=Mode.PRIVATE)
    with BuildSketch(Plane(origin=(-10.5, 120, 2), x_dir=(0, 1, 0), z_dir=(1, 0, 0))) as cong_2_piece_20b_section:
        with BuildLine():
            CenterArc((CONG_2_R, CONG_2_R), CONG_2_R, 180, 90)
            Line((0, CONG_2_R), (0, 0))
            Line((0, 0), (CONG_2_R, 0))
        make_face()
    cong_2_piece_20b = extrude(amount=14.5, mode=Mode.PRIVATE)
    cong_2_piece_20b = split(cong_2_piece_20b, bisect_by=Plane(origin=(0, 120, 2), z_dir=(1, 0, 0)), keep=Keep.TOP, mode=Mode.PRIVATE)
    cong_2_piece_20b = split(cong_2_piece_20b, bisect_by=Plane(origin=(2, 120, 2), z_dir=(-1, 0, 0)), keep=Keep.TOP, mode=Mode.PRIVATE)
    cong_2_piece_20 = cong_2_piece_20a & cong_2_piece_20b
    add(cong_2_piece_20)
    with BuildSketch(Plane(origin=(16.5, 95, 2), x_dir=(0, -1, 0), z_dir=(-1, 0, 0))) as cong_2_piece_21a_section:
        with BuildLine():
            CenterArc((CONG_2_R, CONG_2_R), CONG_2_R, 180, 90)
            Line((0, CONG_2_R), (0, 0))
            Line((0, 0), (CONG_2_R, 0))
        make_face()
    cong_2_piece_21a = extrude(amount=14.5, mode=Mode.PRIVATE)
    cong_2_piece_21a = split(cong_2_piece_21a, bisect_by=Plane(origin=(4, 95, 2), z_dir=(1, 0, 0)), keep=Keep.TOP, mode=Mode.PRIVATE)
    with BuildSketch(Plane(origin=(4, 120, 2), x_dir=(1, 0, 0), z_dir=(0, -1, 0))) as cong_2_piece_21b_section:
        with BuildLine():
            CenterArc((CONG_2_R, CONG_2_R), CONG_2_R, 180, 90)
            Line((0, CONG_2_R), (0, 0))
            Line((0, 0), (CONG_2_R, 0))
        make_face()
    cong_2_piece_21b = extrude(amount=37.5, mode=Mode.PRIVATE)
    cong_2_piece_21b = split(cong_2_piece_21b, bisect_by=Plane(origin=(4, 95, 2), z_dir=(0, -1, 0)), keep=Keep.TOP, mode=Mode.PRIVATE)
    cong_2_piece_21 = cong_2_piece_21a & cong_2_piece_21b
    add(cong_2_piece_21)
    with BuildSketch(Plane(origin=(4, 132.5, 2), x_dir=(1, 0, 0), z_dir=(0, -1, 0))) as cong_2_piece_22a_section:
        with BuildLine():
            CenterArc((CONG_2_R, CONG_2_R), CONG_2_R, 180, 90)
            Line((0, CONG_2_R), (0, 0))
            Line((0, 0), (CONG_2_R, 0))
        make_face()
    cong_2_piece_22a = extrude(amount=37.5, mode=Mode.PRIVATE)
    cong_2_piece_22a = split(cong_2_piece_22a, bisect_by=Plane(origin=(4, 120, 2), z_dir=(0, 1, 0)), keep=Keep.TOP, mode=Mode.PRIVATE)
    with BuildSketch(Plane(origin=(2, 120, 2), x_dir=(0, 1, 0), z_dir=(1, 0, 0))) as cong_2_piece_22b_section:
        with BuildLine():
            CenterArc((CONG_2_R, CONG_2_R), CONG_2_R, 180, 90)
            Line((0, CONG_2_R), (0, 0))
            Line((0, 0), (CONG_2_R, 0))
        make_face()
    cong_2_piece_22b = extrude(amount=14.5, mode=Mode.PRIVATE)
    cong_2_piece_22b = split(cong_2_piece_22b, bisect_by=Plane(origin=(4, 120, 2), z_dir=(1, 0, 0)), keep=Keep.TOP, mode=Mode.PRIVATE)
    cong_2_piece_22 = cong_2_piece_22a & cong_2_piece_22b
    add(cong_2_piece_22)
    # the kernel refuses this fillet: 5 mm, written as the material it takes off along each edge
    with BuildSketch(Plane(origin=(16.5, 30, 17), x_dir=(0, 0, -1), z_dir=(-1, 0, 0)), Plane(origin=(-10.5, 55, 17), x_dir=(0, 0, -1), z_dir=(1, 0, 0)), Plane(origin=(210.5, 120, 17), x_dir=(0, -1, 0), z_dir=(-1, 0, 0)), Plane(origin=(183.5, 95, 17), x_dir=(0, 1, 0), z_dir=(1, 0, 0)), Plane(origin=(183.5, 30, 17), x_dir=(0, 1, 0), z_dir=(1, 0, 0)), Plane(origin=(210.5, 55, 17), x_dir=(0, -1, 0), z_dir=(-1, 0, 0)), Plane(origin=(16.5, 95, 17), x_dir=(0, 0, -1), z_dir=(-1, 0, 0)), Plane(origin=(-10.5, 120, 17), x_dir=(0, 0, -1), z_dir=(1, 0, 0))) as cong_2_2_piece_1:
        with BuildLine():
            CenterArc((CONG_2_R, -CONG_2_R), CONG_2_R, 90, 90)
            Line((0, -CONG_2_R), (0, 0))
            Line((0, 0), (CONG_2_R, 0))
        make_face()
    extrude(amount=27, mode=Mode.SUBTRACT)

    # Esquisse3 → Enlèv. mat.-Extru.1 (cut)
    with BuildSketch(Plane.XY.offset(2)):
        with Locations((2.25, 75)):
            Rectangle(ESQUISSE3_W, ESQUISSE3_H)
        with Locations((197.75, 75)):
            Rectangle(ESQUISSE3_W, ESQUISSE3_H)
    extrude(amount=-ENL_V_MAT_EXTRU_1_DEPTH, mode=Mode.SUBTRACT)

    # Esquisse4 → Boss.-Extru.3 (add)
    # profile 1 of 2: a face of its own
    with BuildSketch(Plane(origin=(0, 0, 0), x_dir=(-1, 0, 0), z_dir=(0, 0, -1))):
        with BuildLine():
            Line((-20, 105), (20, 105))
            ThreePointArc((20, 105), (27.071067812, 102.071067812), (30, 95))
            Line((30, 95), (30, 55))
            ThreePointArc((30, 55), (27.071067812, 47.928932188), (20, 45))
            Line((20, 45), (-20, 45))
            Line((-20, 45), (-20, 105))
        make_face()
        with Locations((15, 90)):
            Circle(ESQUISSE4_R, mode=Mode.SUBTRACT)
        with Locations((15, 60)):
            Circle(ESQUISSE4_R, mode=Mode.SUBTRACT)
    # profile 2 of 2: a face of its own
    with BuildSketch(Plane(origin=(0, 0, 0), x_dir=(-1, 0, 0), z_dir=(0, 0, -1))):
        with BuildLine():
            Line((-180, 45), (-220, 45))
            ThreePointArc((-220, 45), (-227.071067812, 47.928932188), (-230, 55))
            Line((-230, 55), (-230, 95))
            ThreePointArc((-230, 95), (-227.071067812, 102.071067812), (-220, 105))
            Line((-220, 105), (-180, 105))
            Line((-180, 105), (-180, 45))
        make_face()
        with Locations(Location((-215, 60, 0), (0, 0, 180))):
            Circle(ESQUISSE4_R, mode=Mode.SUBTRACT)
        with Locations(Location((-215, 90, 0), (0, 0, 180))):
            Circle(ESQUISSE4_R, mode=Mode.SUBTRACT)
    extrude(amount=-BOSS_EXTRU_3_DEPTH)


solid = part.part
